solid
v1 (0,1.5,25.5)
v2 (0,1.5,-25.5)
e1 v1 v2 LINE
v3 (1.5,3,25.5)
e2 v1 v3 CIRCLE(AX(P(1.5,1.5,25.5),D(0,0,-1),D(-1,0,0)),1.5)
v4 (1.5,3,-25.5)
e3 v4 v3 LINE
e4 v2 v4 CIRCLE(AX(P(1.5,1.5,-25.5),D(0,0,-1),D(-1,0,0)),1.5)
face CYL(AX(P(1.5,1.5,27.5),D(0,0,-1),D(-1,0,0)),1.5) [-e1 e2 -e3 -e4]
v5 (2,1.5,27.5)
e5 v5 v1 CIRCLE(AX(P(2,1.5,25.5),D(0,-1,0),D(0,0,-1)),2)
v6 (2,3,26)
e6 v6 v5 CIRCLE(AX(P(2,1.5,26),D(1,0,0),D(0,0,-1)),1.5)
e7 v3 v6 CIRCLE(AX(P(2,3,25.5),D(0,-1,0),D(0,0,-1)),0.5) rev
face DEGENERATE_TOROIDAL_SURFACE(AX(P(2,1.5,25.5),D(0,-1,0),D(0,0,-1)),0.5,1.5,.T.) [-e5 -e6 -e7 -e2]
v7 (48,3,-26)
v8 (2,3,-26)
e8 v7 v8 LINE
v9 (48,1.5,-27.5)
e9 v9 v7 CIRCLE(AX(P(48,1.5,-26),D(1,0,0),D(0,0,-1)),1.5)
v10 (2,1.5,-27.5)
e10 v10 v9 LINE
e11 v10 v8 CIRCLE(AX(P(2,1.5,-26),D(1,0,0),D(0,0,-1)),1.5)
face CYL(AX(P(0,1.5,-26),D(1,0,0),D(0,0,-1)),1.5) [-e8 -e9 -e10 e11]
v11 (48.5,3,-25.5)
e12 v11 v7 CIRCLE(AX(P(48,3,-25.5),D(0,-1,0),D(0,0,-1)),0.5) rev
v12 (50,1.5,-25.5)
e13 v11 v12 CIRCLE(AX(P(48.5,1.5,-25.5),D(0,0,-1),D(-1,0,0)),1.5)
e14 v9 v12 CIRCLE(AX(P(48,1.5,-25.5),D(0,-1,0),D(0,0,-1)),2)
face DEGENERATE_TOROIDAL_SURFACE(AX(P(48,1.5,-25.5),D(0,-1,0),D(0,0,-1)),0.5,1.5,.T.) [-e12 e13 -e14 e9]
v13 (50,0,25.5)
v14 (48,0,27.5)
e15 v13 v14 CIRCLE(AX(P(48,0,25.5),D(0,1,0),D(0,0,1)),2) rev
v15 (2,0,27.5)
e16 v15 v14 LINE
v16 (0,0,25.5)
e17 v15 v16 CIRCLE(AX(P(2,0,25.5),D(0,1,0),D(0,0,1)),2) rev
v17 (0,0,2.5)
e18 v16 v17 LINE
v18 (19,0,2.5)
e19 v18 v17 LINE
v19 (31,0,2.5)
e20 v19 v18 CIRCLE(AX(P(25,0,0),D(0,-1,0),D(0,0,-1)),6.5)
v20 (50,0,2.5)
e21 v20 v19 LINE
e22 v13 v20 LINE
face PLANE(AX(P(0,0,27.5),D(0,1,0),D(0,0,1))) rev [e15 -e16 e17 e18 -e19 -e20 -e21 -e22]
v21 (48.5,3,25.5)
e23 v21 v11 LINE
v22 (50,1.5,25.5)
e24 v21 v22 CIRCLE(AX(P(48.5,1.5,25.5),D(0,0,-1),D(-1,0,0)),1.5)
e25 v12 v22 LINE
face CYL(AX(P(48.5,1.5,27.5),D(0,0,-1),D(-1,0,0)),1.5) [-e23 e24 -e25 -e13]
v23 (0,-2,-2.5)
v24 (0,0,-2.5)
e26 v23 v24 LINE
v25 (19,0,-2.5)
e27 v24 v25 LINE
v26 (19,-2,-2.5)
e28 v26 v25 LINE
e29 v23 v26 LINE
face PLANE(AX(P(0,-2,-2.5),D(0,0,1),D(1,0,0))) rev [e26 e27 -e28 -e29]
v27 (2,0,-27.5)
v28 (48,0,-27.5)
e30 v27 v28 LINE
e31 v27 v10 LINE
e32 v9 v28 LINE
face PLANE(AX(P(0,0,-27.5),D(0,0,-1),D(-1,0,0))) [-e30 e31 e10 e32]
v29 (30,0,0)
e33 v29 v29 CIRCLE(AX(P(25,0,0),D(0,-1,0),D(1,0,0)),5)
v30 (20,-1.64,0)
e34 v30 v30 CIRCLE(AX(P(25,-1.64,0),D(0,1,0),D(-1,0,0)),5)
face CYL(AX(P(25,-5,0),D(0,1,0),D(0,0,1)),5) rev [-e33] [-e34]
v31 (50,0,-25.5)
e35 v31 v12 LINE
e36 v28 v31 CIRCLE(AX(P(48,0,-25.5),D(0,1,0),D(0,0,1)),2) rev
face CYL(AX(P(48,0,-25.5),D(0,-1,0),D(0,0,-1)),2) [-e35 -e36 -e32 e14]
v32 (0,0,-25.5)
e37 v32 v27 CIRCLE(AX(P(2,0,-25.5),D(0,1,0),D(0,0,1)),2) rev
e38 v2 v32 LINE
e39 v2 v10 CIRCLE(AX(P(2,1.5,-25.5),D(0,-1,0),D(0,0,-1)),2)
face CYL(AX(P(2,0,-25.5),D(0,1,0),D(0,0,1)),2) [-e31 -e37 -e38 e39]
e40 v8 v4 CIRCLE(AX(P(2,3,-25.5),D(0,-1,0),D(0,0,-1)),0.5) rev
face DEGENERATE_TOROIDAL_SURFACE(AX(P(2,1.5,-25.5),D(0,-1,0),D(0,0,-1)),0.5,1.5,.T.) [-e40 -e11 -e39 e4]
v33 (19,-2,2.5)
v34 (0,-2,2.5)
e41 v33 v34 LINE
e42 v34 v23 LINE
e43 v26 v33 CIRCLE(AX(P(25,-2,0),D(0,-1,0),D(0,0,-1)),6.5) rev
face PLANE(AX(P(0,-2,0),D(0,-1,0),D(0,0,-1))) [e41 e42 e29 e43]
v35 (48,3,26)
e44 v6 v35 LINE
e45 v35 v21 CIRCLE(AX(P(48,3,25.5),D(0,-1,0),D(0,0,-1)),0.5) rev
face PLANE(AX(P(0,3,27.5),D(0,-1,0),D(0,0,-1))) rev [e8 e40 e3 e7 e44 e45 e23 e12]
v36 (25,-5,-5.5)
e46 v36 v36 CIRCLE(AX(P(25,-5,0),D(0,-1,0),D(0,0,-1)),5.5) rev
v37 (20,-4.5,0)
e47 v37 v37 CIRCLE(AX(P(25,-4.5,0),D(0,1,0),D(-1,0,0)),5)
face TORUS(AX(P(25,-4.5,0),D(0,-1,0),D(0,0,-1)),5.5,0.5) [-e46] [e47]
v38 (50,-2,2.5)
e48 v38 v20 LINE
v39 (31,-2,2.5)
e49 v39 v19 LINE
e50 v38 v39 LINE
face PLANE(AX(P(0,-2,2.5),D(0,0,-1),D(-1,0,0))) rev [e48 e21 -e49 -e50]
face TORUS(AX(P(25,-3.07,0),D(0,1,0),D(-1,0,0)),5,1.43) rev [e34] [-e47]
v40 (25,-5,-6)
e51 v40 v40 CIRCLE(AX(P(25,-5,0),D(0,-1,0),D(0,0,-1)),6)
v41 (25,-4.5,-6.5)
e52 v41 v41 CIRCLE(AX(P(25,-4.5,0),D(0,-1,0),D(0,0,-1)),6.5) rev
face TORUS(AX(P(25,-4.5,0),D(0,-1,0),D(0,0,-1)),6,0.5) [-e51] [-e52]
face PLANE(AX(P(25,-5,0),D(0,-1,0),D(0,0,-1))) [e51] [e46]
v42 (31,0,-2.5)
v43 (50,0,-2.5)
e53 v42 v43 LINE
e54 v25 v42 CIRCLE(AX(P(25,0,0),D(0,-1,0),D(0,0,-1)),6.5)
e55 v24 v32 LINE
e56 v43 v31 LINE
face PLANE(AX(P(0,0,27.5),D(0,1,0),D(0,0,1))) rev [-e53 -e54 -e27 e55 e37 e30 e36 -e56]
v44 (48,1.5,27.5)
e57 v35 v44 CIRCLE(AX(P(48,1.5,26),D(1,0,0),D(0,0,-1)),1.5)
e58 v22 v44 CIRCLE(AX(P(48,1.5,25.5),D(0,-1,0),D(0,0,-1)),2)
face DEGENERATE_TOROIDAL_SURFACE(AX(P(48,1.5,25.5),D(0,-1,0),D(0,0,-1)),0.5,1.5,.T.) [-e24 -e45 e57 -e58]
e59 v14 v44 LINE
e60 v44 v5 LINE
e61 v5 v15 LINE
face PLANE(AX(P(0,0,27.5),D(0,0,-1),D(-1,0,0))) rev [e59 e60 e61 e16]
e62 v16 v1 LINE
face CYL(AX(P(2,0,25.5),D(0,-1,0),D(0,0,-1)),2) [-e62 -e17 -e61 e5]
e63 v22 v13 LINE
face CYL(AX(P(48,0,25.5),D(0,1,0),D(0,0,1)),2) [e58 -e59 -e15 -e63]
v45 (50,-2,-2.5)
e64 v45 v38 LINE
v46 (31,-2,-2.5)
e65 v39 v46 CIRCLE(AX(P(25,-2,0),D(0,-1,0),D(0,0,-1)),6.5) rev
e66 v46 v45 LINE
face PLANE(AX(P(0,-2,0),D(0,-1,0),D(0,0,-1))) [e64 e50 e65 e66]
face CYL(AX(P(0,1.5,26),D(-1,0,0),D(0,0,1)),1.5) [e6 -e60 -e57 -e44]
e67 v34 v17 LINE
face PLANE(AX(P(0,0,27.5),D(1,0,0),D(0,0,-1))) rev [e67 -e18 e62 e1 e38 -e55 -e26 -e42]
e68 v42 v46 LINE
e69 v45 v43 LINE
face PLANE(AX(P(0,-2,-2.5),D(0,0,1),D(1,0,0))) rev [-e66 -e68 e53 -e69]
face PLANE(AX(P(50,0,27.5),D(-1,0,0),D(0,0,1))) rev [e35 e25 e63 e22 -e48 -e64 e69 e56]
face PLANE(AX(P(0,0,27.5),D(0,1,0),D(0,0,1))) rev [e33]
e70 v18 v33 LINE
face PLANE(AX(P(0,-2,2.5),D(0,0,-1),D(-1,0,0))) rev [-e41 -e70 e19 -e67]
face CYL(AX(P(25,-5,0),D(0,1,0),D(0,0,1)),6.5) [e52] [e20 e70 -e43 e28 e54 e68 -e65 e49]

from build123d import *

# Parameters (mm, degrees)
SKETCH1_W             = 50
SKETCH1_H             = 3
SOLARPANET_DEPTH      = 27.5
FILLET1_R             = 2
FILLET2_R             = 1.5
SKETCH2_W             = 50
SKETCH2_H             = 5
BACKSUPPORT_DEPTH     = 2
SKETCH3_R             = 6.5
SKETCH3_R_2           = 5
SUPPORTRING_DEPTH     = 5
HOLE_START            = -5
SKETCH4_R             = 5
HOLE_4_JOYSTICK_DEPTH = 5
FILLET4_R             = 0.5


with BuildPart() as part:
    # Sketch1 → SolarPanet (new, symmetric)
    with BuildSketch(Plane.XY):
        with Locations((25, 1.5)):
            Rectangle(SKETCH1_W, SKETCH1_H)
    extrude(amount=SOLARPANET_DEPTH, both=True)

    # Fillet1
    fillet1_edges = [part.edges().sort_by_distance(p)[0] for p in [
        (50, 1.5, 27.5),
        (0, 1.5, 27.5),
        (50, 1.5, -27.5),
        (0, 1.5, -27.5),
    ]]
    fillet(fillet1_edges, radius=FILLET1_R)

    # Fillet2
    fillet2_edges = [part.edges().sort_by_distance(p)[0] for p in [
        (0, 3, 0),
        (25, 3, -27.5),
        (25, 3, 27.5),
        (50, 3, 0),
        (0.585786438, 3, 26.914213562),
        (49.414213562, 3, 26.914213562),
        (49.414213562, 3, -26.914213562),
        (0.585786438, 3, -26.914213562),
    ]]
    fillet(fillet2_edges, radius=FILLET2_R)

    # Sketch2 → BackSupport (add)
    with BuildSketch(Plane.XZ):
        with Locations((25, 0)):
            Rectangle(SKETCH2_W, SKETCH2_H)
    extrude(amount=BACKSUPPORT_DEPTH)

    # Sketch3 → SupportRing (add)
    with BuildSketch(Plane.XZ):
        with Locations((25, 0)):
            Circle(SKETCH3_R)
        with Locations((25, 0)):
            Circle(SKETCH3_R_2, mode=Mode.SUBTRACT)
    extrude(amount=SUPPORTRING_DEPTH)

    # Sketch4 → Hole 4 Joystick (cut)
    with BuildSketch(Plane.XZ.offset(5).offset(HOLE_START)):
        with Locations((25, 0)):
            Circle(SKETCH4_R)
    extrude(amount=HOLE_4_JOYSTICK_DEPTH, mode=Mode.SUBTRACT)

    # Sketch5 → Round Cut 4 Joystick (revolve, cut)
    with BuildSketch(Plane.XY, mode=Mode.PRIVATE) as round_cut_4_joystick_sk:
        with BuildLine():
            Line((25, -1.64), (30, -1.64))
            ThreePointArc((30, -1.64), (31.43, -3.07), (30, -4.5))
            Line((30, -4.5), (25, -4.5))
            Line((25, -4.5), (25, -1.64))
        make_face()
    revolve(round_cut_4_joystick_sk.sketch.rotate(Axis((25, 10.438378753, 0), (0, -1, 0)), 22.619864948), axis=Axis((25, 10.438378753, 0), (0, -1, 0)), mode=Mode.SUBTRACT)

    # Fillet4
    fillet4_edges = [part.edges().sort_by_distance(p)[0] for p in [
        (20, -5, 0),
        (18.5, -5, 0),
    ]]
    fillet(fillet4_edges, radius=FILLET4_R - 0.0001)  # a hair under: the kernel refuses the full size


solid = part.part
